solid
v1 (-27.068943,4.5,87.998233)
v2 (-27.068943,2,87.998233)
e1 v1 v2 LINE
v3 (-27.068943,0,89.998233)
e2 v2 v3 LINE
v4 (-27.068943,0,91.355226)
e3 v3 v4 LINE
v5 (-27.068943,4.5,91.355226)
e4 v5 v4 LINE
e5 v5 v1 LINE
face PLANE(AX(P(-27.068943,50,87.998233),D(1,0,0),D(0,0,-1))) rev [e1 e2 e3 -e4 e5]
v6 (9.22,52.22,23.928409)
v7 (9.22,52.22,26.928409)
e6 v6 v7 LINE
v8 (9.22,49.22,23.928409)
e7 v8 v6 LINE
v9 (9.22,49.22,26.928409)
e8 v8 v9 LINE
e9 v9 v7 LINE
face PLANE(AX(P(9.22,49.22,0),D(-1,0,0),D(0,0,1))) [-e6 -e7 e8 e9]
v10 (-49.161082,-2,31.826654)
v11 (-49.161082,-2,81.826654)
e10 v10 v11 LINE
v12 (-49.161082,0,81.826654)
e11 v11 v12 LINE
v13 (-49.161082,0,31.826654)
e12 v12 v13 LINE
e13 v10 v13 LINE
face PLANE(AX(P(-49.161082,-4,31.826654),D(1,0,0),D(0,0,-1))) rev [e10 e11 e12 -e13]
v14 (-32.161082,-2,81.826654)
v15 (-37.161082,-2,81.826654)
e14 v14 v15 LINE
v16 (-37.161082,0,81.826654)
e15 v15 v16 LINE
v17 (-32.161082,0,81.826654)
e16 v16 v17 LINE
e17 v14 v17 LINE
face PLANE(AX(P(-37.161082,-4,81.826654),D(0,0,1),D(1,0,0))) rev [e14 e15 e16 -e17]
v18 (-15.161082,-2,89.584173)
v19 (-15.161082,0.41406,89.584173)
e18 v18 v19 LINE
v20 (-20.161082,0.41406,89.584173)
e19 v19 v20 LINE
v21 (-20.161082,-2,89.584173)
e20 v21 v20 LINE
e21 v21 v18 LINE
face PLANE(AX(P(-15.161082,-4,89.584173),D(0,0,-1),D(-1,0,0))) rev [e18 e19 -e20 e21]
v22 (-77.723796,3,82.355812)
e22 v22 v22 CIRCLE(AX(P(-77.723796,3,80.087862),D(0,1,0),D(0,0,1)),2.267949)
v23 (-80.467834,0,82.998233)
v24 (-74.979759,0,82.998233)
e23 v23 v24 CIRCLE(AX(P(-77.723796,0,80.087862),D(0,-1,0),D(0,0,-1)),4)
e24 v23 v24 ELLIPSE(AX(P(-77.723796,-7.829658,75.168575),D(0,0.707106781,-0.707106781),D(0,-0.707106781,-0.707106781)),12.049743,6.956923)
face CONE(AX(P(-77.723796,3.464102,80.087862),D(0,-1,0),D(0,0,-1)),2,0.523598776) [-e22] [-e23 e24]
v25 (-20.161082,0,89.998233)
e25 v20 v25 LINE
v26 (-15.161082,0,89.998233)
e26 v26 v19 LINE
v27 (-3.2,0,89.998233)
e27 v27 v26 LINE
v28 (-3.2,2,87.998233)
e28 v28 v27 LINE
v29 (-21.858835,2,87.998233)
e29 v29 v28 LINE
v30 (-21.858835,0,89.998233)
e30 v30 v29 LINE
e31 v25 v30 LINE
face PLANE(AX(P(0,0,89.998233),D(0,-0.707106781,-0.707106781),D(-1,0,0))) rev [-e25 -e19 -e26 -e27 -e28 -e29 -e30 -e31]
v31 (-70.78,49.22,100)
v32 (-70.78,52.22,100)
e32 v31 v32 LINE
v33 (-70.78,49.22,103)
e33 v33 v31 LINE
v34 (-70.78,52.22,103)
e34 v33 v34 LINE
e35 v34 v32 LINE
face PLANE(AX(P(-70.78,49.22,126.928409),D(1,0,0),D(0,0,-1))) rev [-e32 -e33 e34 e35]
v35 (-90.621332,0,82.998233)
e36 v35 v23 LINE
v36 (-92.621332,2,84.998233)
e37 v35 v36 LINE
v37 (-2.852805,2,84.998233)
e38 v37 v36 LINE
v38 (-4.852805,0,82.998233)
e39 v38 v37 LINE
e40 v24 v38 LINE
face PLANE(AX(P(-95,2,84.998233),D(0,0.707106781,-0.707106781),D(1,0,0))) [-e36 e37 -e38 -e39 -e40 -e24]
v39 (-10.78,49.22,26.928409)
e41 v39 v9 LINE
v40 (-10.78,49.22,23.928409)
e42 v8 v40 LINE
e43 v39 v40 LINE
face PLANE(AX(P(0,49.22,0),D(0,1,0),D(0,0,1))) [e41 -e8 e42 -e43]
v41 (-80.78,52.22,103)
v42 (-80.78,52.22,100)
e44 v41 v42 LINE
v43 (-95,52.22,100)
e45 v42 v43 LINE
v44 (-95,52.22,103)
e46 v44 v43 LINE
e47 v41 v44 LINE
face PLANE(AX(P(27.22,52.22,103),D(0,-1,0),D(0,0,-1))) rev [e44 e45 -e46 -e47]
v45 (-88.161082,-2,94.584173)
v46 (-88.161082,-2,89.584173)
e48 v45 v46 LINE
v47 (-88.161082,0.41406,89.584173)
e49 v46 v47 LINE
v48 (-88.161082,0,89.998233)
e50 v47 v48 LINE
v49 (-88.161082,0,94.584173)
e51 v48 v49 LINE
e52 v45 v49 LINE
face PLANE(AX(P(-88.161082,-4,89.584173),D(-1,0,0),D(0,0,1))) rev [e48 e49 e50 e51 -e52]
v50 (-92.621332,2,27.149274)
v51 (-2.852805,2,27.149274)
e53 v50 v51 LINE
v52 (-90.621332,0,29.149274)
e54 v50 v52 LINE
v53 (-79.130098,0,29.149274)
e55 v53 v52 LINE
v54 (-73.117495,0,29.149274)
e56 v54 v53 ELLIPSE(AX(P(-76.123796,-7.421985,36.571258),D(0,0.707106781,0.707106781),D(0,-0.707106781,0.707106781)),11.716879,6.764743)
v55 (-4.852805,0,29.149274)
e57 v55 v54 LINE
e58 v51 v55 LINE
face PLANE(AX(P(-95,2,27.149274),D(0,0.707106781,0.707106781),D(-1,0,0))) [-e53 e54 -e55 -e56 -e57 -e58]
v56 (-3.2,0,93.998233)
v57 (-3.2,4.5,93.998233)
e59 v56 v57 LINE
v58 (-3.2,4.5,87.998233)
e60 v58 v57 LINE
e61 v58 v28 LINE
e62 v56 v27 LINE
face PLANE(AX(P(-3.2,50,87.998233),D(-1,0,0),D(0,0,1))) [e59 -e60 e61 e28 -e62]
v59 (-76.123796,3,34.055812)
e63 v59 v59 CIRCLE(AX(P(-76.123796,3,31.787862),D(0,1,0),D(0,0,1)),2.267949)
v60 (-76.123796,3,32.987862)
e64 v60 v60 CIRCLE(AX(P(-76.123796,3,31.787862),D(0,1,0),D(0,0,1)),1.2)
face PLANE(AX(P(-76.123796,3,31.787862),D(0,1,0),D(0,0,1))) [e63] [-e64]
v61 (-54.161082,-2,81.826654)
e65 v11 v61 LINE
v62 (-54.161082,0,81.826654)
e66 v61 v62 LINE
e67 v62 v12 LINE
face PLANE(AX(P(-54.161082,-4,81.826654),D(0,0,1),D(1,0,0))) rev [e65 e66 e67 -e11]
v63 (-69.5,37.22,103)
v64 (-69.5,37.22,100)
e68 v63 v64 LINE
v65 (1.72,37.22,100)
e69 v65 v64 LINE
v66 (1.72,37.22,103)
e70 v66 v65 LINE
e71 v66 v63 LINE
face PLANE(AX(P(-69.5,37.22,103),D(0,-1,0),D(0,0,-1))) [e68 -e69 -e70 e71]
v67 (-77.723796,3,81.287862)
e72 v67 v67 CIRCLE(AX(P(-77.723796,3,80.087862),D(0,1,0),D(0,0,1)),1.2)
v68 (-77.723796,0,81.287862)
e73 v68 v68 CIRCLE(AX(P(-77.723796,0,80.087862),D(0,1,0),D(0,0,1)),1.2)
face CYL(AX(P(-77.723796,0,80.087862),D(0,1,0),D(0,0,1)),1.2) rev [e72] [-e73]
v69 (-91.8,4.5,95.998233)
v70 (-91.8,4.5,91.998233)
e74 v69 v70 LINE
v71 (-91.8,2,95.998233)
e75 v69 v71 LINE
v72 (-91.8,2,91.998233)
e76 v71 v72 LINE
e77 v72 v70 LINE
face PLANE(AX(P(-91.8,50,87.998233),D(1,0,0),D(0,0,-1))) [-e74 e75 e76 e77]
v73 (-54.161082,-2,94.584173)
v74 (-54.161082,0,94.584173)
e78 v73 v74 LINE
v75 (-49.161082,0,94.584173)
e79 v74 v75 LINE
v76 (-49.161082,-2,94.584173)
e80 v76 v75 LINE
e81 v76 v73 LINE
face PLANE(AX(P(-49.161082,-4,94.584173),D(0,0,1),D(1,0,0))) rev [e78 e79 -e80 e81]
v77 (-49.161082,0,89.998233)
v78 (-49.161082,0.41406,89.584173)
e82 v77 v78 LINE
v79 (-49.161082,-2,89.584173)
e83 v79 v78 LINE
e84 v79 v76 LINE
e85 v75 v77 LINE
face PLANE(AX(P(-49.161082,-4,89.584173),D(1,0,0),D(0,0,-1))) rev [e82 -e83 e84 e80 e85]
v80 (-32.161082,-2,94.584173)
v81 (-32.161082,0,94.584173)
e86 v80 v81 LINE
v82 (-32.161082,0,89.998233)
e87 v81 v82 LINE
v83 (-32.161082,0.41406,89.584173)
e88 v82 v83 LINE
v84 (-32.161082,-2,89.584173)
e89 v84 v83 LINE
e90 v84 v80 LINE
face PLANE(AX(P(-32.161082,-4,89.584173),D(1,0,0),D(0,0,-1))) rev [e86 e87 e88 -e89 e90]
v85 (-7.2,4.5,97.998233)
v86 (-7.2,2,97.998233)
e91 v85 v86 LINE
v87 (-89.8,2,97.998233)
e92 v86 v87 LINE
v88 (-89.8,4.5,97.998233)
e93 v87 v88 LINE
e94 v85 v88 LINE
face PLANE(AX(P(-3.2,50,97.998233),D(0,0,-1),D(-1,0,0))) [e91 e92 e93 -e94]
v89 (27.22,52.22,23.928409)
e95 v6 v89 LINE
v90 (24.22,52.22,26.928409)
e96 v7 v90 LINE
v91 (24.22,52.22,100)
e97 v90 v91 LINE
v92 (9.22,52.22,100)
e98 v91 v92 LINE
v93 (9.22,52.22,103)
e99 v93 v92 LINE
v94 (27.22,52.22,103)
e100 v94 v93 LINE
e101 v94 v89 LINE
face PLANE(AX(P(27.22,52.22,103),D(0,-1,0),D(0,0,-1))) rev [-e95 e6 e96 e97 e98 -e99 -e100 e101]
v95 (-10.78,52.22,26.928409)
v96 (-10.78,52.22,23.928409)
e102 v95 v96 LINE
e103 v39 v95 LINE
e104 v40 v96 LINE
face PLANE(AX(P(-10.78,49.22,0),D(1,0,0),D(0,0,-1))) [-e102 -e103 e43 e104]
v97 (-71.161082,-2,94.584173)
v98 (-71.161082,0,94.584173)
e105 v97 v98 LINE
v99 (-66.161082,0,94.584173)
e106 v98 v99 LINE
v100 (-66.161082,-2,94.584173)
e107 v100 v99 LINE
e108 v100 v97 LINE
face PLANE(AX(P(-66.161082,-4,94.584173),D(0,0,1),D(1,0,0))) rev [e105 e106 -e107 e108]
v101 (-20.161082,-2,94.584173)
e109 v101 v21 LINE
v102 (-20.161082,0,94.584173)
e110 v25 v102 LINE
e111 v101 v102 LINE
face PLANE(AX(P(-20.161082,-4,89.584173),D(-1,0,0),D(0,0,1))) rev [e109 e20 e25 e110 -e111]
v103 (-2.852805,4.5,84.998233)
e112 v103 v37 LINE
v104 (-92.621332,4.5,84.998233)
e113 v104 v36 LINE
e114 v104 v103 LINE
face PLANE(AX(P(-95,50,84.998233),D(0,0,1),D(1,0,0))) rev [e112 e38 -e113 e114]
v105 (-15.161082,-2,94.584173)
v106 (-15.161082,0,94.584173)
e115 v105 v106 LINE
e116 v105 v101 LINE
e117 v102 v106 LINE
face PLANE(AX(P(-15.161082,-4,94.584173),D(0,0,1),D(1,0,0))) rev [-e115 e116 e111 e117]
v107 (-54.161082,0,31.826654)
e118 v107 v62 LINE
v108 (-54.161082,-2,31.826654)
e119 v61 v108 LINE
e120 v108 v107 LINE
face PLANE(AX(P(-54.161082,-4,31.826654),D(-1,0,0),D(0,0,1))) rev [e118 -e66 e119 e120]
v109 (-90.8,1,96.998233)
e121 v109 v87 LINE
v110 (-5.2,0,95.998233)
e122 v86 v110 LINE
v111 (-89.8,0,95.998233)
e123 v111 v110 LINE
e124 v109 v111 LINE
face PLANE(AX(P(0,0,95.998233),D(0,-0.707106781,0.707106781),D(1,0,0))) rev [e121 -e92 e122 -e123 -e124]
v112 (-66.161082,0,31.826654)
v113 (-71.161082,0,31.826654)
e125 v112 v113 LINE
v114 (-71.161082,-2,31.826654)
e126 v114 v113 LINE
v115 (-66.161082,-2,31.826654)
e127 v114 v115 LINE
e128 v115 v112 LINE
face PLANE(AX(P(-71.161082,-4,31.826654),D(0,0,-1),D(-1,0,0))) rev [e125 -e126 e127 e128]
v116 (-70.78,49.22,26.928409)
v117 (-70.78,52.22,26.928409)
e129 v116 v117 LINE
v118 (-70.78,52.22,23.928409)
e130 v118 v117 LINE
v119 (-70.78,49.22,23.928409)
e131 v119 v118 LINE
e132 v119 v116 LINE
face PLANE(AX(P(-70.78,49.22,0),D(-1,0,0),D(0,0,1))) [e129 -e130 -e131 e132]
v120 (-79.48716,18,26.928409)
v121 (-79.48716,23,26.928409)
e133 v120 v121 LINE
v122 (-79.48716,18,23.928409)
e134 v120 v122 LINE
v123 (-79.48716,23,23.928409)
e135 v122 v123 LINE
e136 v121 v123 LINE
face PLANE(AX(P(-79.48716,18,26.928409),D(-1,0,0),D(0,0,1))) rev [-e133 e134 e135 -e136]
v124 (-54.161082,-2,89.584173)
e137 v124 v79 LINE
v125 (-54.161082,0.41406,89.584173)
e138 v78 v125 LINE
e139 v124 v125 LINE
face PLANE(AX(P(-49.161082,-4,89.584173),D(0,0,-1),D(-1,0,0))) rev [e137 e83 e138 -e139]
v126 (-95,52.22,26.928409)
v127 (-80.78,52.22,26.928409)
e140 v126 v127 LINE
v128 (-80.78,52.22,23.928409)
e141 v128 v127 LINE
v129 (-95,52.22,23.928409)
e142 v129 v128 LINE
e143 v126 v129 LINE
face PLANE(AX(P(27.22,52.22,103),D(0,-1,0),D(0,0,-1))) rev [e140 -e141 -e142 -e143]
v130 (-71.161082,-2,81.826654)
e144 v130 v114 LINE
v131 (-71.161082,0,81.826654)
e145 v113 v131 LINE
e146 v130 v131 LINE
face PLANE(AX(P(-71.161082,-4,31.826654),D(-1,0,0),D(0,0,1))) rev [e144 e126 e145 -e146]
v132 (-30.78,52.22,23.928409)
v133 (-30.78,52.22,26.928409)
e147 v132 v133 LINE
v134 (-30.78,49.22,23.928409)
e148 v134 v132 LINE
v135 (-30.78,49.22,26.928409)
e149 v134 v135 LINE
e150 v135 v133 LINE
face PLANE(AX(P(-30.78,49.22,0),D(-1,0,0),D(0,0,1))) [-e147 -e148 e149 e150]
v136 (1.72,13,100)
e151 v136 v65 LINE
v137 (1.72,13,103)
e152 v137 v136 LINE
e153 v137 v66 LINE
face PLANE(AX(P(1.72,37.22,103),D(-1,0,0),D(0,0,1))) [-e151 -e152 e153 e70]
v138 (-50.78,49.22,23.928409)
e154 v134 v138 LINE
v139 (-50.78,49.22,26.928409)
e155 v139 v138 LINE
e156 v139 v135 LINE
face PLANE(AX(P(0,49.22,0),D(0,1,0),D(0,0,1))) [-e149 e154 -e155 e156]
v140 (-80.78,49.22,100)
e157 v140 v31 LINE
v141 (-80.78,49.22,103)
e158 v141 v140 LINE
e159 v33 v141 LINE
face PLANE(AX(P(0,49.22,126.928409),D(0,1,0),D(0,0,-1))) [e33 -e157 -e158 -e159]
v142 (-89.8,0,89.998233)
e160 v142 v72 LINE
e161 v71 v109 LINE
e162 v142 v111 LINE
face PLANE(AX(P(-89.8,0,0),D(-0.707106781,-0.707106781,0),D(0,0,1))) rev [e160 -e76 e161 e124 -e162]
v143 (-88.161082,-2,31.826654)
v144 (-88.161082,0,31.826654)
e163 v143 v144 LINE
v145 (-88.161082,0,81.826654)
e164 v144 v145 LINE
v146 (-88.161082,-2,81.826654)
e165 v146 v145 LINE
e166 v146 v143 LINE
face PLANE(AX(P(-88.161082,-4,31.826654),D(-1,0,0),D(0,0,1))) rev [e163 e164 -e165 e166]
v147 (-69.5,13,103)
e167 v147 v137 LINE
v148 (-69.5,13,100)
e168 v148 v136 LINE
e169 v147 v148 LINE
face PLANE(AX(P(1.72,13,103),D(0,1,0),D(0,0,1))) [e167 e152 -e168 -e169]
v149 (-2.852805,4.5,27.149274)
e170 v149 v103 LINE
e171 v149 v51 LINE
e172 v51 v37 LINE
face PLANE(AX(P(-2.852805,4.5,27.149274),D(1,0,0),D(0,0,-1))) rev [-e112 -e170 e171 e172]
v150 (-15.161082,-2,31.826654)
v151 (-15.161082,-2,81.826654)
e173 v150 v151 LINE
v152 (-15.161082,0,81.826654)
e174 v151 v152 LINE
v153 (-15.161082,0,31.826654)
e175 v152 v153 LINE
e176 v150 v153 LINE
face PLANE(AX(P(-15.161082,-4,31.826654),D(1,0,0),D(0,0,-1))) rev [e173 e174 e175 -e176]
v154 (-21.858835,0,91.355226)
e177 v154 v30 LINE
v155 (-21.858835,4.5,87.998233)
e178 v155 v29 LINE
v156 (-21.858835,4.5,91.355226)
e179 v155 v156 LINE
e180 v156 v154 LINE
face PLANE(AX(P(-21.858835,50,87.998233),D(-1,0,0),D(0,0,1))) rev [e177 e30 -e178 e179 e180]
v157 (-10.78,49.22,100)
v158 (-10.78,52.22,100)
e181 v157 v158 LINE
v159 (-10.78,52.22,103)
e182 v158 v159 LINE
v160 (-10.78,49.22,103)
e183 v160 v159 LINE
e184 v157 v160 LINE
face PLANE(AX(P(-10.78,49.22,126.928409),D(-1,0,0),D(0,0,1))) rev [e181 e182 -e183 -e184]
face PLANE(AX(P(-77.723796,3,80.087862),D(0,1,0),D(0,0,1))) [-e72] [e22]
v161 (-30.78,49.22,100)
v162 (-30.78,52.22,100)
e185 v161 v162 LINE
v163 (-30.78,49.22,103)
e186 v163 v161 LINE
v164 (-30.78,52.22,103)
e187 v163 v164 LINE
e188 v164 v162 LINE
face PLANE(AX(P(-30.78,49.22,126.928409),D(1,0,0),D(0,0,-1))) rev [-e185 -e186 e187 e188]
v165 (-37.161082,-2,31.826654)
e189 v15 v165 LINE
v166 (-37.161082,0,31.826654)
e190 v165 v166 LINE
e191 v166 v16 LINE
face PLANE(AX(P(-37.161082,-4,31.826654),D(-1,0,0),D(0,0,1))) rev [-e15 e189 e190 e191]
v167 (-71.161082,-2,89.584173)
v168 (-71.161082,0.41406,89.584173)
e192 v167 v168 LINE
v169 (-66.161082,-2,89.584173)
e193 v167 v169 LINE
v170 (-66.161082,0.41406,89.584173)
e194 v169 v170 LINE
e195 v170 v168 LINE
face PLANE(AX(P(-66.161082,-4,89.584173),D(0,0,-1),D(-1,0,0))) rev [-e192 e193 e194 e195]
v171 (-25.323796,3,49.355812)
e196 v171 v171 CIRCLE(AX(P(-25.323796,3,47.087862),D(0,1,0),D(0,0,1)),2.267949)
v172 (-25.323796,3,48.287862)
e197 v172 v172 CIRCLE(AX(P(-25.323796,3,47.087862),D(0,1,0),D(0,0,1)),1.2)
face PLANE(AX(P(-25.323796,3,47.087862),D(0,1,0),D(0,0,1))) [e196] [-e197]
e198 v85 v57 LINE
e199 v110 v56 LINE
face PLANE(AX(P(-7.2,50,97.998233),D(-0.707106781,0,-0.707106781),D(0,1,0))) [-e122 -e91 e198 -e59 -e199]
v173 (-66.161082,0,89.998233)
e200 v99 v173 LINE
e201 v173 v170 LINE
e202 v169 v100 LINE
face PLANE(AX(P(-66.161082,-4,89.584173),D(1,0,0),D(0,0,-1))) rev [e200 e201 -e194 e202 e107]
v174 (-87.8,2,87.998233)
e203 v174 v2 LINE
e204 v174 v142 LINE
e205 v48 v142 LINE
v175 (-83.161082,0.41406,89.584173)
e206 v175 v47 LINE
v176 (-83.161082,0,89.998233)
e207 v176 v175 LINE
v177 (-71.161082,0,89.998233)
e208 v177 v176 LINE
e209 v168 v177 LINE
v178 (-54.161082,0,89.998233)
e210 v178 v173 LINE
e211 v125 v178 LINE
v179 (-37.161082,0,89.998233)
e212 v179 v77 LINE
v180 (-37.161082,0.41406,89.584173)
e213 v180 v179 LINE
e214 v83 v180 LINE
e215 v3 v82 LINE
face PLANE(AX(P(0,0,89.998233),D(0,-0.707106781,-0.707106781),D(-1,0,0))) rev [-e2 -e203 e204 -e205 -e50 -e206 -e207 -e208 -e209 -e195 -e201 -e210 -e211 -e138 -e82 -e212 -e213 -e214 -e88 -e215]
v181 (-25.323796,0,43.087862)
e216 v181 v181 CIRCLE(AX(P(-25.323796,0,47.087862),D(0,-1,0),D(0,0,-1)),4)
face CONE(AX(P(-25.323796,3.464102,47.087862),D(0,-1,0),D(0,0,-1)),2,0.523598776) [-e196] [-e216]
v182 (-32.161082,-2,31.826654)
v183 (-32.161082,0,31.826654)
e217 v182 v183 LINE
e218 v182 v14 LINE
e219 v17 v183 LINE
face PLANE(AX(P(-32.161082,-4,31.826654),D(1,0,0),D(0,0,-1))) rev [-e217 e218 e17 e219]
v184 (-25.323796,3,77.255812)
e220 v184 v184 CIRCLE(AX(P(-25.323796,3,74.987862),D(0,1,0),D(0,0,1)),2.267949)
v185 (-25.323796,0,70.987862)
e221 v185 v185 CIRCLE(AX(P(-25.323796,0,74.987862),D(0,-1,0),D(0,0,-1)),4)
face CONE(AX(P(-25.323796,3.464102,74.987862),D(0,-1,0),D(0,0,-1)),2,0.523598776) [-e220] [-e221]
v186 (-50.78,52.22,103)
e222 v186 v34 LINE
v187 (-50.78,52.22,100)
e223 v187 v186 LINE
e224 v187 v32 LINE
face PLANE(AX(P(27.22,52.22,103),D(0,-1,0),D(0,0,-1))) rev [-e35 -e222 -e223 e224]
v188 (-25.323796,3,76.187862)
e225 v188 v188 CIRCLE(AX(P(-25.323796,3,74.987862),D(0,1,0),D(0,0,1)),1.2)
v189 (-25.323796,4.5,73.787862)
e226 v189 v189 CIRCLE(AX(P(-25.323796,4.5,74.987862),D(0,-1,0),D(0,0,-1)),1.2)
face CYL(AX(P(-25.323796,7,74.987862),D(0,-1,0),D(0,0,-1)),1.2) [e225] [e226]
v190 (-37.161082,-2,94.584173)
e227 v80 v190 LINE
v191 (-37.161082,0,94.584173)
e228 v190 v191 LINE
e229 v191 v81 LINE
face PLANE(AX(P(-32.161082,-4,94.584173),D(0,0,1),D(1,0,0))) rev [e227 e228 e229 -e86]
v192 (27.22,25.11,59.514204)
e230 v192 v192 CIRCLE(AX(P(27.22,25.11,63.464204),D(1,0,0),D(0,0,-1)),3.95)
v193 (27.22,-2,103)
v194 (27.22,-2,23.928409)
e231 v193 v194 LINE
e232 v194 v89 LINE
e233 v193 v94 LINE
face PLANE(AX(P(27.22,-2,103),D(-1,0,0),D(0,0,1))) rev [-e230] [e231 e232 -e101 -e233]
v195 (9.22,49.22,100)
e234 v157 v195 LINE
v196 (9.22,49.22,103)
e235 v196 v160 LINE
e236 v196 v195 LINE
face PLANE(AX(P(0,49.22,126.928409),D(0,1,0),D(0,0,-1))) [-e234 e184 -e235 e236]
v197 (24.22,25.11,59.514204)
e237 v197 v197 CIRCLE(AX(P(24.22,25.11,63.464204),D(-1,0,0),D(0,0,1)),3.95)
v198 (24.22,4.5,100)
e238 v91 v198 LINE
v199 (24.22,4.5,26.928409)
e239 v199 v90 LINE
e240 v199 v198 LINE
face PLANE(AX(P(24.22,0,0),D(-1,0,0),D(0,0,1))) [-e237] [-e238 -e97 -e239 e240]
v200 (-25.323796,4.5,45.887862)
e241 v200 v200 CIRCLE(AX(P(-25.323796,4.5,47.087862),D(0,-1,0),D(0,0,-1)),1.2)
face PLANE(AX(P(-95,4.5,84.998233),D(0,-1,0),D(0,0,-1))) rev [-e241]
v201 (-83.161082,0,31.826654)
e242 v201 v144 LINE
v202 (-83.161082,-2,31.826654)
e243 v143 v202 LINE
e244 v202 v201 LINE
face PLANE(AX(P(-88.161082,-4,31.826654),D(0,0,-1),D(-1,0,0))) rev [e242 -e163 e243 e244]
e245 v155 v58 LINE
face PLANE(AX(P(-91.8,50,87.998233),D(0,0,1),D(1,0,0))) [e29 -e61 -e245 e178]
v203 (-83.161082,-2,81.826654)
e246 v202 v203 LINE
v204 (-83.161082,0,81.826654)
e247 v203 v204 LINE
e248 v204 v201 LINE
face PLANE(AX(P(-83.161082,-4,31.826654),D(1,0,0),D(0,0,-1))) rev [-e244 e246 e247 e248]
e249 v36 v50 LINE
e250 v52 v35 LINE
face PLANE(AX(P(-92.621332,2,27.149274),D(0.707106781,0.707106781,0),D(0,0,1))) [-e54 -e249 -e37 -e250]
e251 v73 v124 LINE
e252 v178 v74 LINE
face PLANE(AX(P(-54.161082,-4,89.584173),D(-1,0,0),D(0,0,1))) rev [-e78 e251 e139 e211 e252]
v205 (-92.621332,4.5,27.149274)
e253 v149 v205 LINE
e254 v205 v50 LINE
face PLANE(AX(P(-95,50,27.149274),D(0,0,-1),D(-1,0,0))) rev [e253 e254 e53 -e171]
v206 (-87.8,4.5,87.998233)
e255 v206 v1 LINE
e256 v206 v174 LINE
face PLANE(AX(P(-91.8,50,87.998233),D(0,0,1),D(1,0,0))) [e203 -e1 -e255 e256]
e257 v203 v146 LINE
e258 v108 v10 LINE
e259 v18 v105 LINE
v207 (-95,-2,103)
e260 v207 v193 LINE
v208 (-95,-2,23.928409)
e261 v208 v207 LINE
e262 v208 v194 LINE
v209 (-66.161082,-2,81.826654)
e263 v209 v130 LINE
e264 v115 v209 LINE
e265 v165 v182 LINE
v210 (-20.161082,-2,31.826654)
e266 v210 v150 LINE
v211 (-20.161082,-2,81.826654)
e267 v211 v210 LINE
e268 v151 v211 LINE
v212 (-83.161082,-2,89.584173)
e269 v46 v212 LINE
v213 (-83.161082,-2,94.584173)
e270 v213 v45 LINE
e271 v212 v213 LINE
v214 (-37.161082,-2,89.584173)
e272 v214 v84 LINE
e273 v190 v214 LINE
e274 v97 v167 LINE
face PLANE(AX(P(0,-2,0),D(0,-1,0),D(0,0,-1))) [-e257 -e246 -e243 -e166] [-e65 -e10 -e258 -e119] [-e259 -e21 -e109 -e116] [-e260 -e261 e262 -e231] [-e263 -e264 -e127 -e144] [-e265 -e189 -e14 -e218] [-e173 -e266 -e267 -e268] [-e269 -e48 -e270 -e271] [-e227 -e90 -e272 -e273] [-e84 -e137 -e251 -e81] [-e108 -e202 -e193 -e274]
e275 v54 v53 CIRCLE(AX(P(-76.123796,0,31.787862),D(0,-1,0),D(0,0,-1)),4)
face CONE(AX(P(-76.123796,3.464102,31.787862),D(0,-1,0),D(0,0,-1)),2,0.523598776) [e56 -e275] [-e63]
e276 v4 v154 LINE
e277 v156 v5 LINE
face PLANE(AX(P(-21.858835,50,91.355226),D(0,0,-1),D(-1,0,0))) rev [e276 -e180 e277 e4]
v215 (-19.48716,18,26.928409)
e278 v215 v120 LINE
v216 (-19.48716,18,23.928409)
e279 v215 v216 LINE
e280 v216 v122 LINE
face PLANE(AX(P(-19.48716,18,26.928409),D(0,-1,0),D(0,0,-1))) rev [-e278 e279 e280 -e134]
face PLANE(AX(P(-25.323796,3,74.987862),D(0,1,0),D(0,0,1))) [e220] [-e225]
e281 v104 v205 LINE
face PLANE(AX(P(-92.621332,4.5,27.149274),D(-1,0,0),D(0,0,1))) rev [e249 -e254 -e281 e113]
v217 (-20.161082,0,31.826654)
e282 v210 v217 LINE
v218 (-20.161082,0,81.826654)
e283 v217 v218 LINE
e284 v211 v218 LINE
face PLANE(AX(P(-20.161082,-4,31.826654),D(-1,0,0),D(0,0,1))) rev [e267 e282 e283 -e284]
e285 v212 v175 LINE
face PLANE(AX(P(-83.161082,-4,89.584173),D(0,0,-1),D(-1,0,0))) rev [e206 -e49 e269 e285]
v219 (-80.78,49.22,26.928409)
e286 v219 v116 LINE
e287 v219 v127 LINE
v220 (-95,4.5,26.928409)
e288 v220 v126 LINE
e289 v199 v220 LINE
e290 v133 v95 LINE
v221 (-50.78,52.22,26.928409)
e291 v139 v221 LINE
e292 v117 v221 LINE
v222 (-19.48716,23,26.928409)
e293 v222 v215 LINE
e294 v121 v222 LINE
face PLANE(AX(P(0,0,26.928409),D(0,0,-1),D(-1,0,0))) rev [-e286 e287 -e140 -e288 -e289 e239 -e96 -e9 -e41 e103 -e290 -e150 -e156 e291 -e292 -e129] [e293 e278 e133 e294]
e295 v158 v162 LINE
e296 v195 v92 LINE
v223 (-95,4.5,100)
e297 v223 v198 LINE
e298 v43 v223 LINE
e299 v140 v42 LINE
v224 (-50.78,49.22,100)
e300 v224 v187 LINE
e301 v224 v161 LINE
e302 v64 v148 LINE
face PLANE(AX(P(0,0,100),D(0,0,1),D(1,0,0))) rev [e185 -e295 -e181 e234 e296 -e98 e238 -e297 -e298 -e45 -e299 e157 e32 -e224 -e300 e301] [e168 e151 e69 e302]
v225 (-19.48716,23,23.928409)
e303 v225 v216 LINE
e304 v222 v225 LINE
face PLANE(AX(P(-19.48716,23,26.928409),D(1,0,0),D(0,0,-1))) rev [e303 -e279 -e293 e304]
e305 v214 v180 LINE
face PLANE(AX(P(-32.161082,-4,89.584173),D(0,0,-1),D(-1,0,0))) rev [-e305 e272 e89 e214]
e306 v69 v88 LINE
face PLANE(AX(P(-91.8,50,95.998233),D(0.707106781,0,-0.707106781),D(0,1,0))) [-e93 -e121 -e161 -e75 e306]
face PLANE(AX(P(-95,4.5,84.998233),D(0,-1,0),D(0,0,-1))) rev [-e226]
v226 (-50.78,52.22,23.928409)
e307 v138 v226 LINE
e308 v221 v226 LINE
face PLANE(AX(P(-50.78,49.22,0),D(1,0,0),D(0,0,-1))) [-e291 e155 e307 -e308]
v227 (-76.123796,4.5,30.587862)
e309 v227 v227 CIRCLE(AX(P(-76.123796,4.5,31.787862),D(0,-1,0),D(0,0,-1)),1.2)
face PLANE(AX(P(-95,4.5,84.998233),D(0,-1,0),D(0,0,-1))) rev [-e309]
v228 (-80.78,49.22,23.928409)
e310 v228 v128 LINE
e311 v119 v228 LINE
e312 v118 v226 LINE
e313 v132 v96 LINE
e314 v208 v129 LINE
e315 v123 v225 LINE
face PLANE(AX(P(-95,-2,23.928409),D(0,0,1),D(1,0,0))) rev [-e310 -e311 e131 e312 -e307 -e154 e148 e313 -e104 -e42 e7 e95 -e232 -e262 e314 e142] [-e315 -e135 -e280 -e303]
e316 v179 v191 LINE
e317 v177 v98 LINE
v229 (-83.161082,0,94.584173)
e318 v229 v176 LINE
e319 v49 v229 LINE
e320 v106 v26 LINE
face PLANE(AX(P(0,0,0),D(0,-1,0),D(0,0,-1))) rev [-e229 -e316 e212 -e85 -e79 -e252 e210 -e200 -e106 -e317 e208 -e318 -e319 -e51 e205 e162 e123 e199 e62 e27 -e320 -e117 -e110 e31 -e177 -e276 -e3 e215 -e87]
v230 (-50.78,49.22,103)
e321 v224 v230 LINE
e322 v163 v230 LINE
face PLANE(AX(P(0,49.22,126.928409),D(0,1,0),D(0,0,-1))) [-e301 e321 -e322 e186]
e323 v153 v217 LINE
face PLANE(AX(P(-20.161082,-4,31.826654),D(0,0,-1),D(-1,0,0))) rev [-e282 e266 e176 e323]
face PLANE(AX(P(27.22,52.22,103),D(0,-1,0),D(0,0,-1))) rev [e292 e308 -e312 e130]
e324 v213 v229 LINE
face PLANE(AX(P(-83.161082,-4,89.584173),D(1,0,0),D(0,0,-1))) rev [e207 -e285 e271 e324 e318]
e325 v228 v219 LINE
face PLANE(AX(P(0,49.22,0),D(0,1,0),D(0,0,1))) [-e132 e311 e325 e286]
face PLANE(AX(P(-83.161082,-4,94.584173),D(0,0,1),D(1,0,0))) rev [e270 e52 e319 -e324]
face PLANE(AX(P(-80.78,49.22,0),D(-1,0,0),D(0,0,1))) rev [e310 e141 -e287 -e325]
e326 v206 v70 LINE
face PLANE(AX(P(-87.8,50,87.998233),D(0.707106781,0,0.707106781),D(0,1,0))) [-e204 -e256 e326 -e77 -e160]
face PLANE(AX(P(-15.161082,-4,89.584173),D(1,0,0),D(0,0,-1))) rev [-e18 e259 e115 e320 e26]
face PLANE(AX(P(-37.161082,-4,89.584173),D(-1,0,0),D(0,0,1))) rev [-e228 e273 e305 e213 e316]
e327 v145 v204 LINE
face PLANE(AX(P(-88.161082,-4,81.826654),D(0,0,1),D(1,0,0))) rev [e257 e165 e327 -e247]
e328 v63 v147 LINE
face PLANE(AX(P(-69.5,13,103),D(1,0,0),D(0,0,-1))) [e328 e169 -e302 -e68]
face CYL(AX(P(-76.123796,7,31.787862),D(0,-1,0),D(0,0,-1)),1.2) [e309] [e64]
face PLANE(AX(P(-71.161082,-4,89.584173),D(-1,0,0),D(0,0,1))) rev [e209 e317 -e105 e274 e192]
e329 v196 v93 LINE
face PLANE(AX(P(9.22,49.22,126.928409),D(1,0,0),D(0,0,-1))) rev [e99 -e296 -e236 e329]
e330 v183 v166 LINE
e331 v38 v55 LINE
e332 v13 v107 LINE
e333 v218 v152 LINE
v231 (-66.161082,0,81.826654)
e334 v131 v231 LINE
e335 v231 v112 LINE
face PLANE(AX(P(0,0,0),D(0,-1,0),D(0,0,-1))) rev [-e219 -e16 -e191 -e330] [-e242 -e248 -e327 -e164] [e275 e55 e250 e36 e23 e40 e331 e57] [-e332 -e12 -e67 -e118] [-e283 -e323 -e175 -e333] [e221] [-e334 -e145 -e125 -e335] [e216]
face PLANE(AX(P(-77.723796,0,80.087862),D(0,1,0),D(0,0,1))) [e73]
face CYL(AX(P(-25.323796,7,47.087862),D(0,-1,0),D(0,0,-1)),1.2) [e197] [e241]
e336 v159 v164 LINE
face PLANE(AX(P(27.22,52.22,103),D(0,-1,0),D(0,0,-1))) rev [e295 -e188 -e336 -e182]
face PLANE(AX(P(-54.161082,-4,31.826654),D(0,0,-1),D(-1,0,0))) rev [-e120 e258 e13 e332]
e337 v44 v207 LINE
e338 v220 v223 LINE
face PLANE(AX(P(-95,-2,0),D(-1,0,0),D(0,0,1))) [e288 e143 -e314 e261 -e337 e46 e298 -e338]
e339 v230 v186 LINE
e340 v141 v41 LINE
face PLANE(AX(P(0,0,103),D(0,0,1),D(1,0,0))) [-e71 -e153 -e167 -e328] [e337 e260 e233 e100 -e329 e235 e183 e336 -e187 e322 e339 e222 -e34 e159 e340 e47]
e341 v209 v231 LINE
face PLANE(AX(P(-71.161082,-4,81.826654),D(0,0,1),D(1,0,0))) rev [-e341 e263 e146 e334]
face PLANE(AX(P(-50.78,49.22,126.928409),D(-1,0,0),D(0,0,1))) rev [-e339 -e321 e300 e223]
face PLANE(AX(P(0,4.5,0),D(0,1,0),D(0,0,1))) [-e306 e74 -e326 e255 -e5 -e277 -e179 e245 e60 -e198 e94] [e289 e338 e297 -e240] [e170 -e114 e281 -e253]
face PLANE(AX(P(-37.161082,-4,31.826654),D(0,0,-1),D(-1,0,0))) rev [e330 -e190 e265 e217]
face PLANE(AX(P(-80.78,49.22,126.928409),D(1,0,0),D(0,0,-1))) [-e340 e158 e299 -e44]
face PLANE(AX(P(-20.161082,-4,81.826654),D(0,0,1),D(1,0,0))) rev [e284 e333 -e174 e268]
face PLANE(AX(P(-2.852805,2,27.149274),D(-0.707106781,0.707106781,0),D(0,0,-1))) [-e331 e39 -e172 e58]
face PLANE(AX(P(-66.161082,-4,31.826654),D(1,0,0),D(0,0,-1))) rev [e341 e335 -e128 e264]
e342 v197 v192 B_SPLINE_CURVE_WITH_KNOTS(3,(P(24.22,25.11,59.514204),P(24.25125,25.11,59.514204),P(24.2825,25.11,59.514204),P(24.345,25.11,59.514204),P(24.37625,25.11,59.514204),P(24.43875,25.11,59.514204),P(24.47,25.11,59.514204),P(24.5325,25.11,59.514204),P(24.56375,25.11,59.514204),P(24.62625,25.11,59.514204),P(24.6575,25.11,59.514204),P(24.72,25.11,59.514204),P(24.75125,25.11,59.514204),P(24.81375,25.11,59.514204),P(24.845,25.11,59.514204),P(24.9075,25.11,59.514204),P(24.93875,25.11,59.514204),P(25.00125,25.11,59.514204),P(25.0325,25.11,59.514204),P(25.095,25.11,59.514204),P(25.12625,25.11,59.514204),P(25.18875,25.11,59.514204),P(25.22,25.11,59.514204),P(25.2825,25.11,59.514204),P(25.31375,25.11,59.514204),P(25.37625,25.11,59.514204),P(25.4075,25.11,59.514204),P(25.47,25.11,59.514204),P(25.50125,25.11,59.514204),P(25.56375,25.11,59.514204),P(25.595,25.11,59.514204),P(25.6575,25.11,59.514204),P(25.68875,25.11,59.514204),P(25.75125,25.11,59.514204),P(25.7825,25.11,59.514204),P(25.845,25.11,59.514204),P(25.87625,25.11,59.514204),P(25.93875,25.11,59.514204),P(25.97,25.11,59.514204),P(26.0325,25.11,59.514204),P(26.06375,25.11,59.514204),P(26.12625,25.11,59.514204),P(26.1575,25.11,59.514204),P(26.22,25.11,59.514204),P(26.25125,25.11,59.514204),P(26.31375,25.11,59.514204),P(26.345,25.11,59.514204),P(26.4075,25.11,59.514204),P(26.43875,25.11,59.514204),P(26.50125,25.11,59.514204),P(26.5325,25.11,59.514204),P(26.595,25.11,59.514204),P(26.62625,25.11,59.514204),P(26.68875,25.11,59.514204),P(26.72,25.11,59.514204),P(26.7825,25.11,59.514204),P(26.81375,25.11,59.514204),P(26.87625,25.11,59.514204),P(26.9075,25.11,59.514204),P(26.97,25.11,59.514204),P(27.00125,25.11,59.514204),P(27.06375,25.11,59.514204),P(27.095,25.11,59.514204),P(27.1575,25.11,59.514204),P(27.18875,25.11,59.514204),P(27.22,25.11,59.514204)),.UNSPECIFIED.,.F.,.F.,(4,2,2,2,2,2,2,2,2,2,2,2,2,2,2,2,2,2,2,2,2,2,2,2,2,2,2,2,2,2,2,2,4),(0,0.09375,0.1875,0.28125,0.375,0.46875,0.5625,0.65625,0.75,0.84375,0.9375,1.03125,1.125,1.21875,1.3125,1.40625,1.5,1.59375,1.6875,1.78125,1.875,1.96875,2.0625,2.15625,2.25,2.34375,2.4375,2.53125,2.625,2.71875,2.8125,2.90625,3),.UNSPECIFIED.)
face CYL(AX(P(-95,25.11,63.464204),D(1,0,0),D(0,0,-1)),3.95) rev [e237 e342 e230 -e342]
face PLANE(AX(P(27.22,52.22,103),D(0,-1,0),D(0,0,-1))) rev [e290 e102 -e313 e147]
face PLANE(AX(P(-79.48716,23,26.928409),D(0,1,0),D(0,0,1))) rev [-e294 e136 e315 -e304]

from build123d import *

# Parameters (mm, degrees)
SKETCH_1_W              = 95
SKETCH_1_H              = 100
EXTRUDE_1_DEPTH         = 2
SKETCH_3_R              = 1.2
EXTRUDE_2_DEPTH         = 7
SKETCH_4_R              = 2
EXTRUDE_3_DEPTH         = 3
CHAMFER_1_SIZE          = 2
CHAMFER_1_SIZE_2        = 3.464101615
SKETCH_5_W              = 88.6
SKETCH_5_H              = 22
SKETCH_5_H_2            = 10
EXTRUDE_4_DEPTH         = 50
SKETCH_8_W              = 2.378668295
SKETCH_8_H              = 57.848959614
SKETCH_8_W_2            = 2.852804632
EXTRUDE_6_DEPTH         = 4.5
SKETCH_7_W              = 5
SKETCH_7_H              = 50
SKETCH_7_H_2            = 9
SKETCH_7_H_3            = 5
CUT_EXTRUDE_1_DEPTH     = 4
CHAMFER_START           = -83.16108201
CHAMFER_2_DEPTH         = 12
CHAMFER_START_2         = -66.16108201
CHAMFER_2_2_DEPTH       = 12
CHAMFER_START_3         = -49.16108201
CHAMFER_2_3_DEPTH       = 12
CHAMFER_START_4         = -32.16108201
CHAMFER_2_4_DEPTH       = 12
CHAMFER_START_5         = -15.16108201
CHAMFER_2_5_DEPTH       = 12.308277378
CHAMFER_START_6         = -92.621331705
CHAMFER_2_6_DEPTH       = 4.460249695
CHAMFER_2_7_DEPTH       = 89.768527073
CHAMFER_START_7         = 1
CHAMFER_2_8_DEPTH       = 86.998233291
CHAMFER_2_9_DEPTH       = 26.149273677
CHAMFER_START_8         = 84.998233291
CHAMFER_2_10_DEPTH      = 14.001766709
SKETCH_13_W             = 5.505876785
SKETCH_13_H             = 3
CUT_EXTRUDE_6_DEPTH     = 10
SKETCH_17_W             = 2
SKETCH_17_H             = 2
SKETCH_17_W_2           = 0.768088879
EXTRUDE_9_DEPTH         = 20
CHAMFER_3_SIZE          = 2
CHAMFER_3_SIZE_2        = 3.464101615
CHAMFER_6_SIZE          = 4
SKETCH_18_W             = 4.206221656
SKETCH_18_H             = 3.021554381
SKETCH_18_W_2           = 5.210107228
SKETCH_18_H_2           = 3.356992826
EXTRUDE_11_DEPTH        = 50
FILLET_2_R              = 2
SKETCH_20_W             = 2.378668295
SKETCH_20_H             = 7.010495323
EXTRUDE_13_DEPTH        = 30
SKETCH_21_W             = 2.378668295
SKETCH_21_H             = 4.566526532
EXTRUDE_14_DEPTH        = 12
SKETCH_22_R             = 1.2
CUT_EXTRUDE_7_DEPTH     = 3
SKETCH_24_W             = 14.181336584
SKETCH_24_H             = 31.500920509
CUT_EXTRUDE_8_DEPTH     = 1
CHAMFER_7_SIZE          = 2
CORTAR_EXTRUIR1_DEPTH   = 147.714007511
CROQUIS4_W              = 122.22
CROQUIS4_H              = 54.22
CROQUIS4_W_2            = 71.22
CROQUIS4_H_2            = 24.22
SALIENTE_EXTRUIR2_DEPTH = 3
CROQUIS5_W              = 100
CROQUIS5_H              = 6.5
SALIENTE_EXTRUIR3_DEPTH = 27.22
CROQUIS10_W             = 122.22
CROQUIS10_H             = 23.928408898
CORTAR_EXTRUIR2_DEPTH   = 149.024316921
SALIENTE_EXTRUIR4_REACH = 170.148
CROQUIS13_W             = 1.988266343
CROQUIS13_H             = 6.5
CROQUIS14_W             = 122.22
CROQUIS14_H             = 54.22
SALIENTE_EXTRUIR5_DEPTH = 3
CROQUIS15_W             = 79.071591102
CROQUIS15_H             = 54.22
SALIENTE_EXTRUIR6_DEPTH = 3
CROQUIS16_R             = 3.95
CORTAR_EXTRUIR3_DEPTH   = 169.147723148
CROQUIS18_W             = 10
CROQUIS18_H             = 3
CROQUIS18_W_2           = 20
CORTAR_EXTRUIR4_DEPTH   = 3
CROQUIS23_W             = 60
CROQUIS23_H             = 5
CORTAR_EXTRUIR5_DEPTH   = 3


with BuildPart() as part:
    # Эскиз1 → Бобышка-Вытянуть1 (new body)
    with BuildSketch(Plane(origin=(0, 0, 0), x_dir=(1, 0, 0), z_dir=(0, 1, 0))):
        with Locations((-47.5, -50)):
            Rectangle(SKETCH_1_W, SKETCH_1_H)
    extrude(amount=-EXTRUDE_1_DEPTH)

    # Эскиз3 → Бобышка-Вытянуть2 (add)
    with BuildSketch(Plane(origin=(0, 0, 0), x_dir=(1, 0, 0), z_dir=(0, 1, 0))):
        with Locations(Location((-76.12379646, -31.787862309, 0), (0, 0, 90))):
            Circle(SKETCH_3_R)
        with Locations(Location((-25.32379646, -47.087862309, 0), (0, 0, 90))):
            Circle(SKETCH_3_R)
        with Locations(Location((-25.32379646, -74.987862309, 0), (0, 0, 90))):
            Circle(SKETCH_3_R)
    extrude(amount=EXTRUDE_2_DEPTH)

    # Эскиз4 → Бобышка-Вытянуть3 (add)
    with BuildSketch(Plane(origin=(0, 0, 0), x_dir=(1, 0, 0), z_dir=(0, 1, 0))):
        with Locations(Location((-76.12379646, -31.787862309, 0), (0, 0, 90))):
            Circle(SKETCH_4_R)
        with Locations(Location((-25.32379646, -47.087862309, 0), (0, 0, 90))):
            Circle(SKETCH_4_R)
        with Locations(Location((-25.32379646, -74.987862309, 0), (0, 0, 90))):
            Circle(SKETCH_4_R)
        with Locations(Location((-77.72379646, -80.087862309, 0), (0, 0, 90))):
            Circle(SKETCH_4_R)
    extrude(amount=EXTRUDE_3_DEPTH)

    # Фаска1
    # the kernel refuses this chamfer: 3.464101615, 2 mm, written as the material it adds along each edge
    with BuildSketch(Plane(origin=(-25.32379646, 0, 47.087862309), x_dir=(0, 0, -1), z_dir=(1, 0, 0))) as chamfer_1_piece_1_section:
        Polygon((2 + CHAMFER_1_SIZE, 0), (2, CHAMFER_1_SIZE_2), (2, 0), align=None)
    chamfer_1_piece_1 = revolve(axis=Axis((-25.32379646, 0, 47.087862309), (0, 1, 0)), mode=Mode.PRIVATE)
    chamfer_1_piece_1 = split(chamfer_1_piece_1, bisect_by=Plane(origin=(-25.32379646, 3, 47.087862309), z_dir=(0, -1, 0)), keep=Keep.TOP, mode=Mode.PRIVATE)
    add(chamfer_1_piece_1)
    with BuildSketch(Plane(origin=(-76.12379646, 0, 31.787862309), x_dir=(0, 0, -1), z_dir=(1, 0, 0))) as chamfer_1_piece_2_section:
        Polygon((2 + CHAMFER_1_SIZE, 0), (2, CHAMFER_1_SIZE_2), (2, 0), align=None)
    chamfer_1_piece_2 = revolve(axis=Axis((-76.12379646, 0, 31.787862309), (0, 1, 0)), mode=Mode.PRIVATE)
    chamfer_1_piece_2 = split(chamfer_1_piece_2, bisect_by=Plane(origin=(-76.12379646, 3, 31.787862309), z_dir=(0, -1, 0)), keep=Keep.TOP, mode=Mode.PRIVATE)
    add(chamfer_1_piece_2)
    with BuildSketch(Plane(origin=(-77.72379646, 0, 80.087862309), x_dir=(0, 0, -1), z_dir=(1, 0, 0))) as chamfer_1_piece_3_section:
        Polygon((2 + CHAMFER_1_SIZE, 0), (2, CHAMFER_1_SIZE_2), (2, 0), align=None)
    chamfer_1_piece_3 = revolve(axis=Axis((-77.72379646, 0, 80.087862309), (0, 1, 0)), mode=Mode.PRIVATE)
    chamfer_1_piece_3 = split(chamfer_1_piece_3, bisect_by=Plane(origin=(-77.72379646, 3, 80.087862309), z_dir=(0, -1, 0)), keep=Keep.TOP, mode=Mode.PRIVATE)
    add(chamfer_1_piece_3)
    with BuildSketch(Plane(origin=(-25.32379646, 0, 74.987862309), x_dir=(0, 0, -1), z_dir=(1, 0, 0))) as chamfer_1_piece_4_section:
        Polygon((2 + CHAMFER_1_SIZE, 0), (2, CHAMFER_1_SIZE_2), (2, 0), align=None)
    chamfer_1_piece_4 = revolve(axis=Axis((-25.32379646, 0, 74.987862309), (0, 1, 0)), mode=Mode.PRIVATE)
    chamfer_1_piece_4 = split(chamfer_1_piece_4, bisect_by=Plane(origin=(-25.32379646, 3, 74.987862309), z_dir=(0, -1, 0)), keep=Keep.TOP, mode=Mode.PRIVATE)
    add(chamfer_1_piece_4)

    # Эскиз5 → Бобышка-Вытянуть4 (add)
    # profile 1 of 2: a face of its own
    with BuildSketch(Plane(origin=(0, 0, 0), x_dir=(1, 0, 0), z_dir=(0, 1, 0))):
        Polygon((0, 0), (-95, 0), (-95, -3), (-95, -24.149273677), (-95, -27.149273677), (0, -27.149273677), (0, -24.149273677), (0, -3), align=None)
        with Locations((-47.5, -13.149273677)):
            Rectangle(SKETCH_5_W, SKETCH_5_H, mode=Mode.SUBTRACT)
    # profile 2 of 2: a face of its own
    with BuildSketch(Plane(origin=(0, 0, 0), x_dir=(1, 0, 0), z_dir=(0, 1, 0))):
        Polygon((0, -100), (-95, -100), (-95, -97), (-95, -87.998233291), (-95, -84.998233291), (0, -84.998233291), (0, -87.998233291), (0, -97), align=None)
        with Locations((-47.5, -92.998233291)):
            Rectangle(SKETCH_5_W, SKETCH_5_H_2, mode=Mode.SUBTRACT)
    extrude(amount=EXTRUDE_4_DEPTH)

    # Эскиз8 → Бобышка-Вытянуть6 (add)
    with BuildSketch(Plane(origin=(0, 0, 0), x_dir=(1, 0, 0), z_dir=(0, 1, 0))):
        with Locations((-93.810665852, -56.073753484)):
            Rectangle(SKETCH_8_W, SKETCH_8_H)
        with Locations((-1.426402316, -56.073753484)):
            Rectangle(SKETCH_8_W_2, SKETCH_8_H)
    extrude(amount=EXTRUDE_6_DEPTH)

    # Эскиз7 → Вырез-Вытянуть1 (cut)
    with BuildSketch(Plane(origin=(0, 0, 0), x_dir=(1, 0, 0), z_dir=(0, 1, 0))):
        with Locations((-68.66108201, -56.826653613)):
            Rectangle(SKETCH_7_W, SKETCH_7_H)
        with Locations((-85.66108201, -56.826653613)):
            Rectangle(SKETCH_7_W, SKETCH_7_H)
        with Locations((-68.66108201, -10.718973477)):
            Rectangle(SKETCH_7_W, SKETCH_7_H_2)
        with Locations((-85.66108201, -10.718973477)):
            Rectangle(SKETCH_7_W, SKETCH_7_H_2)
        with Locations((-85.66108201, -92.084172994)):
            Rectangle(SKETCH_7_W, SKETCH_7_H_3)
        with Locations((-51.66108201, -56.826653613)):
            Rectangle(SKETCH_7_W, SKETCH_7_H)
        with Locations((-34.66108201, -56.826653613)):
            Rectangle(SKETCH_7_W, SKETCH_7_H)
        with Locations((-17.66108201, -56.826653613)):
            Rectangle(SKETCH_7_W, SKETCH_7_H)
        with Locations((-68.66108201, -92.084172994)):
            Rectangle(SKETCH_7_W, SKETCH_7_H_3)
        with Locations((-51.66108201, -10.718973477)):
            Rectangle(SKETCH_7_W, SKETCH_7_H_2)
        with Locations((-51.66108201, -92.084172994)):
            Rectangle(SKETCH_7_W, SKETCH_7_H_3)
        with Locations((-34.66108201, -10.718973477)):
            Rectangle(SKETCH_7_W, SKETCH_7_H_2)
        with Locations((-34.66108201, -92.084172994)):
            Rectangle(SKETCH_7_W, SKETCH_7_H_3)
        with Locations((-17.66108201, -10.718973477)):
            Rectangle(SKETCH_7_W, SKETCH_7_H_2)
        with Locations((-17.66108201, -92.084172994)):
            Rectangle(SKETCH_7_W, SKETCH_7_H_3)
    extrude(amount=-CUT_EXTRUDE_1_DEPTH, mode=Mode.SUBTRACT)

    # Фаска2: read off the stored shape, not the designer's step
    # Фаска2 outline → Фаска2 (add)
    with BuildSketch(Plane.YZ.offset(CHAMFER_START)):
        Polygon((0, 89.998233291), (0, 89.584172994), (0.414060297, 89.584172994), align=None)
    extrude(amount=CHAMFER_2_DEPTH)

    # Chamfer 2 2 outline → Chamfer 2 2 (add)
    with BuildSketch(Plane.YZ.offset(CHAMFER_START_2)):
        Polygon((0, 89.998233291), (0, 89.584172994), (0.414060297, 89.584172994), align=None)
    extrude(amount=CHAMFER_2_2_DEPTH)

    # Chamfer 2 3 outline → Chamfer 2 3 (add)
    with BuildSketch(Plane.YZ.offset(CHAMFER_START_3)):
        Polygon((0, 89.998233291), (0, 89.584172994), (0.414060297, 89.584172994), align=None)
    extrude(amount=CHAMFER_2_3_DEPTH)

    # Chamfer 2 4 outline → Chamfer 2 4 (add)
    with BuildSketch(Plane.YZ.offset(CHAMFER_START_4)):
        Polygon((0, 89.998233291), (0, 89.584172994), (0.414060297, 89.584172994), align=None)
    extrude(amount=CHAMFER_2_4_DEPTH)

    # Chamfer 2 5 outline → Chamfer 2 5 (add)
    with BuildSketch(Plane.YZ.offset(CHAMFER_START_5)):
        Polygon((0, 89.998233291), (0, 89.584172994), (0.414060297, 89.584172994), align=None)
    extrude(amount=CHAMFER_2_5_DEPTH)

    # Chamfer 2 6 outline → Chamfer 2 6 (add)
    with BuildSketch(Plane.YZ.offset(CHAMFER_START_6)):
        Polygon((0, 89.998233291), (0, 89.584172994), (0.414060297, 89.584172994), align=None)
    extrude(amount=CHAMFER_2_6_DEPTH)

    # Chamfer 2 7 outline → Chamfer 2 7 (add)
    with BuildSketch(Plane.YZ.offset(CHAMFER_START_6)):
        Polygon((0, 97.998233291), (0, 95.998233291), (2, 97.998233291), align=None)
        Polygon((0.414060297, 89.584172994), (0, 89.584172994), (0, 87.998233291), (2, 87.998233291), align=None)
        Polygon((0, 24.149273677), (0, 22.149273677), (2, 24.149273677), align=None)
        Polygon((2, 2.149273677), (0, 4.149273677), (0, 2.149273677), align=None)
        Polygon((0, 27.149273677), (2, 27.149273677), (0, 29.149273677), align=None)
        Polygon((0, 84.998233291), (0, 82.998233291), (2, 84.998233291), align=None)
    extrude(amount=CHAMFER_2_7_DEPTH)

    # Chamfer 2 8 outline → Chamfer 2 8 (add)
    with BuildSketch(Plane.XY.offset(CHAMFER_START_7)):
        Polygon((-92.621331705, 0), (-90.621331705, 0), (-92.621331705, 2), align=None)
        Polygon((-4.852804632, 0), (-2.852804632, 0), (-2.852804632, 2), align=None)
    extrude(amount=CHAMFER_2_8_DEPTH)

    # Chamfer 2 9 outline → Chamfer 2 9 (add)
    with BuildSketch(Plane.XY.offset(CHAMFER_START_7)):
        Polygon((-3.2, 2), (-5.2, 0), (-4.852804632, 0), (-3.2, 1.652804632), align=None)
        Polygon((-89.8, 0), (-91.8, 2), (-91.8, 1.178668295), (-90.621331705, 0), align=None)
    extrude(amount=CHAMFER_2_9_DEPTH)

    # Chamfer 2 10 outline → Chamfer 2 10 (add)
    with BuildSketch(Plane.XY.offset(CHAMFER_START_8)):
        Polygon((-89.8, 0), (-91.8, 2), (-91.8, 0), align=None)
    extrude(amount=CHAMFER_2_10_DEPTH)

    # Эскиз13 → Вырез-Вытянуть6 (cut)
    with BuildSketch(Plane(origin=(0, 50, 0), x_dir=(1, 0, 0), z_dir=(0, 1, 0))):
        with Locations((-13.994725416, -25.649273677)):
            Rectangle(SKETCH_13_W, SKETCH_13_H)
        with Locations((-13.994725416, -86.498233291)):
            Rectangle(SKETCH_13_W, SKETCH_13_H)
    extrude(amount=-CUT_EXTRUDE_6_DEPTH, mode=Mode.SUBTRACT)

    # Эскиз17 → Бобышка-Вытянуть9 (add)
    with BuildSketch(Plane(origin=(0, 50, 0), x_dir=(1, 0, 0), z_dir=(0, 1, 0))):
        with Locations((-91.621331705, -28.149273677)):
            Rectangle(SKETCH_17_W, SKETCH_17_H)
        with Locations((-91.621331705, -83.998233291)):
            Rectangle(SKETCH_17_W, SKETCH_17_H)
        with Locations((-5.236849072, -83.998233291)):
            Rectangle(SKETCH_17_W_2, SKETCH_17_H)
        with Locations((-3.852804632, -28.149273677)):
            Rectangle(SKETCH_17_W, SKETCH_17_H)
    extrude(amount=-EXTRUDE_9_DEPTH)

    # Фаска3
    # the kernel refuses this chamfer: 3.464101615, 2 mm, written as the material it adds along each edge
    with BuildSketch(Plane(origin=(-5.620893511, 30, 84.998233291), x_dir=(0, -1, 0), z_dir=(1, 0, 0))) as chamfer_3_piece_1_section:
        Polygon((CHAMFER_3_SIZE, 0), (0, CHAMFER_3_SIZE_2), (0, 0), align=None)
    chamfer_3_piece_1 = extrude(amount=0.768088879, mode=Mode.PRIVATE)
    chamfer_3_piece_1 = split(chamfer_3_piece_1, bisect_by=Plane(origin=(-5.620893511, 30, 82.998233291), z_dir=(0, 0, 1)), keep=Keep.TOP, mode=Mode.PRIVATE)
    add(chamfer_3_piece_1)
    with BuildSketch(Plane(origin=(-92.621331705, 30, 84.998233291), x_dir=(0, -1, 0), z_dir=(1, 0, 0))) as chamfer_3_piece_2_section:
        Polygon((CHAMFER_3_SIZE_2, 0), (0, CHAMFER_3_SIZE), (0, 0), align=None)
    chamfer_3_piece_2 = extrude(amount=2, mode=Mode.PRIVATE)
    chamfer_3_piece_2 = split(chamfer_3_piece_2, bisect_by=Plane(origin=(-92.621331705, 30, 82.998233291), z_dir=(0, 0, 1)), keep=Keep.TOP, mode=Mode.PRIVATE)
    add(chamfer_3_piece_2)
    with BuildSketch(Plane(origin=(-92.621331705, 30, 27.149273677), x_dir=(0, -1, 0), z_dir=(1, 0, 0))) as chamfer_3_piece_3_section:
        Polygon((CHAMFER_3_SIZE_2, 0), (0, -CHAMFER_3_SIZE), (0, 0), align=None)
    chamfer_3_piece_3 = extrude(amount=2, mode=Mode.PRIVATE)
    chamfer_3_piece_3 = split(chamfer_3_piece_3, bisect_by=Plane(origin=(-92.621331705, 30, 29.149273677), z_dir=(0, 0, -1)), keep=Keep.TOP, mode=Mode.PRIVATE)
    add(chamfer_3_piece_3)
    with BuildSketch(Plane(origin=(-2.852804632, 30, 27.149273677), x_dir=(0, -1, 0), z_dir=(-1, 0, 0))) as chamfer_3_piece_4_section:
        Polygon((CHAMFER_3_SIZE_2, 0), (0, CHAMFER_3_SIZE), (0, 0), align=None)
    chamfer_3_piece_4 = extrude(amount=2, mode=Mode.PRIVATE)
    chamfer_3_piece_4 = split(chamfer_3_piece_4, bisect_by=Plane(origin=(-2.852804632, 30, 29.149273677), z_dir=(0, 0, -1)), keep=Keep.TOP, mode=Mode.PRIVATE)
    add(chamfer_3_piece_4)

    # Фаска6
    chamfer_6_edges = [part.edges().sort_by_distance(p)[0] for p in [
        (-91.8, 26, 24.149273677),
        (-91.8, 26, 2.149273677),
        (-91.8, 26, 87.998233291),
        (-3.2, 26, 24.149273677),
        (-3.2, 26, 97.998233291),
        (-3.2, 26, 2.149273677),
    ]]
    chamfer(chamfer_6_edges, length=CHAMFER_6_SIZE - 0.0001)  # a hair under: the kernel refuses the full size

    # Эскиз18 → Бобышка-Вытянуть11 (add)
    with BuildSketch(Plane(origin=(0, 0, 0), x_dir=(1, 0, 0), z_dir=(0, 1, 0))):
        with Locations((-19.755724458, -22.638496487)):
            Rectangle(SKETCH_18_W, SKETCH_18_H)
        with Locations((-24.4638889, -89.676729704)):
            Rectangle(SKETCH_18_W_2, SKETCH_18_H_2)
    extrude(amount=EXTRUDE_11_DEPTH)

    # Скругление2
    fillet_2_edges = [part.edges().sort_by_distance(p)[0] for p in [
        (-16.747663808, 40, 25.649273677),
        (-11.241787023, 40, 25.649273677),
        (-11.241787023, 40, 86.498233291),
        (-16.747663808, 40, 86.498233291),
    ]]
    fillet(fillet_2_edges, radius=FILLET_2_R)

    # Эскиз20 → Бобышка-Вытянуть13 (add)
    with BuildSketch(Plane(origin=(0, 4.5, 0), x_dir=(1, 0, 0), z_dir=(0, 1, 0))):
        with Locations((-93.810665852, -30.654521339)):
            Rectangle(SKETCH_20_W, SKETCH_20_H)
    extrude(amount=EXTRUDE_13_DEPTH)

    # Эскиз21 → Бобышка-Вытянуть14 (add)
    with BuildSketch(Plane(origin=(0, 4.5, 0), x_dir=(1, 0, 0), z_dir=(0, 1, 0))):
        with Locations((-93.810665852, -82.714970025)):
            Rectangle(SKETCH_21_W, SKETCH_21_H)
    extrude(amount=EXTRUDE_14_DEPTH)

    # Эскиз22 → Вырез-Вытянуть7 (cut)
    with BuildSketch(Plane(origin=(0, 3, 0), x_dir=(1, 0, 0), z_dir=(0, 1, 0))):
        with Locations(Location((-77.72379646, -80.087862309, 0), (0, 0, 270))):
            Circle(SKETCH_22_R)
    extrude(amount=-CUT_EXTRUDE_7_DEPTH, mode=Mode.SUBTRACT)

    # Эскиз24 → Вырез-Вытянуть8 (cut)
    with BuildSketch(Plane.XY.offset(87.998233291)):
        with Locations((-53.545237887, 34.249539746)):
            Rectangle(SKETCH_24_W, SKETCH_24_H)
    extrude(amount=-CUT_EXTRUDE_8_DEPTH, mode=Mode.SUBTRACT)

    # Фаска7
    chamfer_7_edges = [part.edges().sort_by_distance(p)[0] for p in [
        (-91.8, 26, 97.998233291),
    ]]
    chamfer(chamfer_7_edges, length=CHAMFER_7_SIZE)

    # Croquis1 → Cortar-Extruir1 (cut, through all)
    with BuildSketch(Plane(origin=(0, 0, 0), x_dir=(0, 0, -1), z_dir=(1, 0, 0))):
        Polygon((-84.998233291, 4.5), (-100, 4.5), (-100, 50), (0, 50), (0, 4.5), align=None)
    extrude(amount=-CORTAR_EXTRUIR1_DEPTH, mode=Mode.SUBTRACT)

    # Croquis4 → Saliente-Extruir2 (add)
    with BuildSketch(Plane.XY.offset(100)):
        with Locations((-33.89, 25.11)):
            Rectangle(CROQUIS4_W, CROQUIS4_H)
        with Locations((-33.89, 25.11)):
            Rectangle(CROQUIS4_W_2, CROQUIS4_H_2, mode=Mode.SUBTRACT)
    extrude(amount=SALIENTE_EXTRUIR2_DEPTH)

    # Croquis5 → Saliente-Extruir3 (add)
    with BuildSketch(Plane(origin=(0, 0, 0), x_dir=(0, 0, -1), z_dir=(1, 0, 0))):
        with Locations((-50, 1.25)):
            Rectangle(CROQUIS5_W, CROQUIS5_H)
    extrude(amount=SALIENTE_EXTRUIR3_DEPTH)

    # Croquis10 → Cortar-Extruir2 (cut, through all)
    with BuildSketch(Plane(origin=(0, 4.5, 0), x_dir=(1, 0, 0), z_dir=(0, 1, 0))):
        with Locations((-33.89, -11.964204449)):
            Rectangle(CROQUIS10_W, CROQUIS10_H)
    extrude(amount=-CORTAR_EXTRUIR2_DEPTH, mode=Mode.SUBTRACT)

    # Croquis13 → Saliente-Extruir4 (add, up to next)
    with BuildSketch(Plane.ZY.offset(95), mode=Mode.PRIVATE) as saliente_extruir4_sk1:
        with Locations((24.92254207, 1.25)):
            Rectangle(CROQUIS13_W, CROQUIS13_H)
    saliente_extruir4_tool1 = extrude(saliente_extruir4_sk1.sketch, amount=-SALIENTE_EXTRUIR4_REACH, mode=Mode.PRIVATE) - part.part
    add(saliente_extruir4_tool1.solids().sort_by_distance((-95, 1.25, 24.922542))[0])
    add(saliente_extruir4_tool1.solids().sort_by_distance((-95, 1.25, 24.922542))[1])

    # Croquis14 → Saliente-Extruir5 (add)
    with BuildSketch(Plane(origin=(0, 0, 23.928408898), x_dir=(-1, 0, 0), z_dir=(0, 0, -1))):
        with Locations((33.89, 25.11)):
            Rectangle(CROQUIS14_W, CROQUIS14_H)
    extrude(amount=-SALIENTE_EXTRUIR5_DEPTH)

    # Croquis15 → Saliente-Extruir6 (add)
    with BuildSketch(Plane(origin=(27.22, 0, 0), x_dir=(0, 0, -1), z_dir=(1, 0, 0))):
        with Locations((-63.464204449, 25.11)):
            Rectangle(CROQUIS15_W, CROQUIS15_H)
    extrude(amount=-SALIENTE_EXTRUIR6_DEPTH)

    # Croquis16 → Cortar-Extruir3 (cut, through all)
    with BuildSketch(Plane(origin=(27.22, 0, 0), x_dir=(0, 0, -1), z_dir=(1, 0, 0))):
        with Locations((-63.464204449, 25.11)):
            Circle(CROQUIS16_R)
    extrude(amount=-CORTAR_EXTRUIR3_DEPTH, mode=Mode.SUBTRACT)

    # Croquis18 → Cortar-Extruir4 (cut)
    with BuildSketch(Plane(origin=(0, 52.22, 0), x_dir=(1, 0, 0), z_dir=(0, 1, 0))):
        with Locations((-75.78, -25.428408898)):
            Rectangle(CROQUIS18_W, CROQUIS18_H)
        with Locations((-0.78, -25.428408898)):
            Rectangle(CROQUIS18_W_2, CROQUIS18_H)
        with Locations((-40.78, -25.428408898)):
            Rectangle(CROQUIS18_W_2, CROQUIS18_H)
    cortar_extruir4 = extrude(amount=-CORTAR_EXTRUIR4_DEPTH, mode=Mode.SUBTRACT)

    # Simetría3: Cortar-Extruir4 across plane
    add(cortar_extruir4.mirror(Plane.XY.offset(63.464204449)), mode=Mode.SUBTRACT)

    # Croquis23 → Cortar-Extruir5 (cut)
    with BuildSketch(Plane(origin=(0, 0, 23.928408898), x_dir=(-1, 0, 0), z_dir=(0, 0, -1))):
        with Locations((49.487159882, 20.5)):
            Rectangle(CROQUIS23_W, CROQUIS23_H)
    extrude(amount=-CORTAR_EXTRUIR5_DEPTH, mode=Mode.SUBTRACT)


solid = part.part
